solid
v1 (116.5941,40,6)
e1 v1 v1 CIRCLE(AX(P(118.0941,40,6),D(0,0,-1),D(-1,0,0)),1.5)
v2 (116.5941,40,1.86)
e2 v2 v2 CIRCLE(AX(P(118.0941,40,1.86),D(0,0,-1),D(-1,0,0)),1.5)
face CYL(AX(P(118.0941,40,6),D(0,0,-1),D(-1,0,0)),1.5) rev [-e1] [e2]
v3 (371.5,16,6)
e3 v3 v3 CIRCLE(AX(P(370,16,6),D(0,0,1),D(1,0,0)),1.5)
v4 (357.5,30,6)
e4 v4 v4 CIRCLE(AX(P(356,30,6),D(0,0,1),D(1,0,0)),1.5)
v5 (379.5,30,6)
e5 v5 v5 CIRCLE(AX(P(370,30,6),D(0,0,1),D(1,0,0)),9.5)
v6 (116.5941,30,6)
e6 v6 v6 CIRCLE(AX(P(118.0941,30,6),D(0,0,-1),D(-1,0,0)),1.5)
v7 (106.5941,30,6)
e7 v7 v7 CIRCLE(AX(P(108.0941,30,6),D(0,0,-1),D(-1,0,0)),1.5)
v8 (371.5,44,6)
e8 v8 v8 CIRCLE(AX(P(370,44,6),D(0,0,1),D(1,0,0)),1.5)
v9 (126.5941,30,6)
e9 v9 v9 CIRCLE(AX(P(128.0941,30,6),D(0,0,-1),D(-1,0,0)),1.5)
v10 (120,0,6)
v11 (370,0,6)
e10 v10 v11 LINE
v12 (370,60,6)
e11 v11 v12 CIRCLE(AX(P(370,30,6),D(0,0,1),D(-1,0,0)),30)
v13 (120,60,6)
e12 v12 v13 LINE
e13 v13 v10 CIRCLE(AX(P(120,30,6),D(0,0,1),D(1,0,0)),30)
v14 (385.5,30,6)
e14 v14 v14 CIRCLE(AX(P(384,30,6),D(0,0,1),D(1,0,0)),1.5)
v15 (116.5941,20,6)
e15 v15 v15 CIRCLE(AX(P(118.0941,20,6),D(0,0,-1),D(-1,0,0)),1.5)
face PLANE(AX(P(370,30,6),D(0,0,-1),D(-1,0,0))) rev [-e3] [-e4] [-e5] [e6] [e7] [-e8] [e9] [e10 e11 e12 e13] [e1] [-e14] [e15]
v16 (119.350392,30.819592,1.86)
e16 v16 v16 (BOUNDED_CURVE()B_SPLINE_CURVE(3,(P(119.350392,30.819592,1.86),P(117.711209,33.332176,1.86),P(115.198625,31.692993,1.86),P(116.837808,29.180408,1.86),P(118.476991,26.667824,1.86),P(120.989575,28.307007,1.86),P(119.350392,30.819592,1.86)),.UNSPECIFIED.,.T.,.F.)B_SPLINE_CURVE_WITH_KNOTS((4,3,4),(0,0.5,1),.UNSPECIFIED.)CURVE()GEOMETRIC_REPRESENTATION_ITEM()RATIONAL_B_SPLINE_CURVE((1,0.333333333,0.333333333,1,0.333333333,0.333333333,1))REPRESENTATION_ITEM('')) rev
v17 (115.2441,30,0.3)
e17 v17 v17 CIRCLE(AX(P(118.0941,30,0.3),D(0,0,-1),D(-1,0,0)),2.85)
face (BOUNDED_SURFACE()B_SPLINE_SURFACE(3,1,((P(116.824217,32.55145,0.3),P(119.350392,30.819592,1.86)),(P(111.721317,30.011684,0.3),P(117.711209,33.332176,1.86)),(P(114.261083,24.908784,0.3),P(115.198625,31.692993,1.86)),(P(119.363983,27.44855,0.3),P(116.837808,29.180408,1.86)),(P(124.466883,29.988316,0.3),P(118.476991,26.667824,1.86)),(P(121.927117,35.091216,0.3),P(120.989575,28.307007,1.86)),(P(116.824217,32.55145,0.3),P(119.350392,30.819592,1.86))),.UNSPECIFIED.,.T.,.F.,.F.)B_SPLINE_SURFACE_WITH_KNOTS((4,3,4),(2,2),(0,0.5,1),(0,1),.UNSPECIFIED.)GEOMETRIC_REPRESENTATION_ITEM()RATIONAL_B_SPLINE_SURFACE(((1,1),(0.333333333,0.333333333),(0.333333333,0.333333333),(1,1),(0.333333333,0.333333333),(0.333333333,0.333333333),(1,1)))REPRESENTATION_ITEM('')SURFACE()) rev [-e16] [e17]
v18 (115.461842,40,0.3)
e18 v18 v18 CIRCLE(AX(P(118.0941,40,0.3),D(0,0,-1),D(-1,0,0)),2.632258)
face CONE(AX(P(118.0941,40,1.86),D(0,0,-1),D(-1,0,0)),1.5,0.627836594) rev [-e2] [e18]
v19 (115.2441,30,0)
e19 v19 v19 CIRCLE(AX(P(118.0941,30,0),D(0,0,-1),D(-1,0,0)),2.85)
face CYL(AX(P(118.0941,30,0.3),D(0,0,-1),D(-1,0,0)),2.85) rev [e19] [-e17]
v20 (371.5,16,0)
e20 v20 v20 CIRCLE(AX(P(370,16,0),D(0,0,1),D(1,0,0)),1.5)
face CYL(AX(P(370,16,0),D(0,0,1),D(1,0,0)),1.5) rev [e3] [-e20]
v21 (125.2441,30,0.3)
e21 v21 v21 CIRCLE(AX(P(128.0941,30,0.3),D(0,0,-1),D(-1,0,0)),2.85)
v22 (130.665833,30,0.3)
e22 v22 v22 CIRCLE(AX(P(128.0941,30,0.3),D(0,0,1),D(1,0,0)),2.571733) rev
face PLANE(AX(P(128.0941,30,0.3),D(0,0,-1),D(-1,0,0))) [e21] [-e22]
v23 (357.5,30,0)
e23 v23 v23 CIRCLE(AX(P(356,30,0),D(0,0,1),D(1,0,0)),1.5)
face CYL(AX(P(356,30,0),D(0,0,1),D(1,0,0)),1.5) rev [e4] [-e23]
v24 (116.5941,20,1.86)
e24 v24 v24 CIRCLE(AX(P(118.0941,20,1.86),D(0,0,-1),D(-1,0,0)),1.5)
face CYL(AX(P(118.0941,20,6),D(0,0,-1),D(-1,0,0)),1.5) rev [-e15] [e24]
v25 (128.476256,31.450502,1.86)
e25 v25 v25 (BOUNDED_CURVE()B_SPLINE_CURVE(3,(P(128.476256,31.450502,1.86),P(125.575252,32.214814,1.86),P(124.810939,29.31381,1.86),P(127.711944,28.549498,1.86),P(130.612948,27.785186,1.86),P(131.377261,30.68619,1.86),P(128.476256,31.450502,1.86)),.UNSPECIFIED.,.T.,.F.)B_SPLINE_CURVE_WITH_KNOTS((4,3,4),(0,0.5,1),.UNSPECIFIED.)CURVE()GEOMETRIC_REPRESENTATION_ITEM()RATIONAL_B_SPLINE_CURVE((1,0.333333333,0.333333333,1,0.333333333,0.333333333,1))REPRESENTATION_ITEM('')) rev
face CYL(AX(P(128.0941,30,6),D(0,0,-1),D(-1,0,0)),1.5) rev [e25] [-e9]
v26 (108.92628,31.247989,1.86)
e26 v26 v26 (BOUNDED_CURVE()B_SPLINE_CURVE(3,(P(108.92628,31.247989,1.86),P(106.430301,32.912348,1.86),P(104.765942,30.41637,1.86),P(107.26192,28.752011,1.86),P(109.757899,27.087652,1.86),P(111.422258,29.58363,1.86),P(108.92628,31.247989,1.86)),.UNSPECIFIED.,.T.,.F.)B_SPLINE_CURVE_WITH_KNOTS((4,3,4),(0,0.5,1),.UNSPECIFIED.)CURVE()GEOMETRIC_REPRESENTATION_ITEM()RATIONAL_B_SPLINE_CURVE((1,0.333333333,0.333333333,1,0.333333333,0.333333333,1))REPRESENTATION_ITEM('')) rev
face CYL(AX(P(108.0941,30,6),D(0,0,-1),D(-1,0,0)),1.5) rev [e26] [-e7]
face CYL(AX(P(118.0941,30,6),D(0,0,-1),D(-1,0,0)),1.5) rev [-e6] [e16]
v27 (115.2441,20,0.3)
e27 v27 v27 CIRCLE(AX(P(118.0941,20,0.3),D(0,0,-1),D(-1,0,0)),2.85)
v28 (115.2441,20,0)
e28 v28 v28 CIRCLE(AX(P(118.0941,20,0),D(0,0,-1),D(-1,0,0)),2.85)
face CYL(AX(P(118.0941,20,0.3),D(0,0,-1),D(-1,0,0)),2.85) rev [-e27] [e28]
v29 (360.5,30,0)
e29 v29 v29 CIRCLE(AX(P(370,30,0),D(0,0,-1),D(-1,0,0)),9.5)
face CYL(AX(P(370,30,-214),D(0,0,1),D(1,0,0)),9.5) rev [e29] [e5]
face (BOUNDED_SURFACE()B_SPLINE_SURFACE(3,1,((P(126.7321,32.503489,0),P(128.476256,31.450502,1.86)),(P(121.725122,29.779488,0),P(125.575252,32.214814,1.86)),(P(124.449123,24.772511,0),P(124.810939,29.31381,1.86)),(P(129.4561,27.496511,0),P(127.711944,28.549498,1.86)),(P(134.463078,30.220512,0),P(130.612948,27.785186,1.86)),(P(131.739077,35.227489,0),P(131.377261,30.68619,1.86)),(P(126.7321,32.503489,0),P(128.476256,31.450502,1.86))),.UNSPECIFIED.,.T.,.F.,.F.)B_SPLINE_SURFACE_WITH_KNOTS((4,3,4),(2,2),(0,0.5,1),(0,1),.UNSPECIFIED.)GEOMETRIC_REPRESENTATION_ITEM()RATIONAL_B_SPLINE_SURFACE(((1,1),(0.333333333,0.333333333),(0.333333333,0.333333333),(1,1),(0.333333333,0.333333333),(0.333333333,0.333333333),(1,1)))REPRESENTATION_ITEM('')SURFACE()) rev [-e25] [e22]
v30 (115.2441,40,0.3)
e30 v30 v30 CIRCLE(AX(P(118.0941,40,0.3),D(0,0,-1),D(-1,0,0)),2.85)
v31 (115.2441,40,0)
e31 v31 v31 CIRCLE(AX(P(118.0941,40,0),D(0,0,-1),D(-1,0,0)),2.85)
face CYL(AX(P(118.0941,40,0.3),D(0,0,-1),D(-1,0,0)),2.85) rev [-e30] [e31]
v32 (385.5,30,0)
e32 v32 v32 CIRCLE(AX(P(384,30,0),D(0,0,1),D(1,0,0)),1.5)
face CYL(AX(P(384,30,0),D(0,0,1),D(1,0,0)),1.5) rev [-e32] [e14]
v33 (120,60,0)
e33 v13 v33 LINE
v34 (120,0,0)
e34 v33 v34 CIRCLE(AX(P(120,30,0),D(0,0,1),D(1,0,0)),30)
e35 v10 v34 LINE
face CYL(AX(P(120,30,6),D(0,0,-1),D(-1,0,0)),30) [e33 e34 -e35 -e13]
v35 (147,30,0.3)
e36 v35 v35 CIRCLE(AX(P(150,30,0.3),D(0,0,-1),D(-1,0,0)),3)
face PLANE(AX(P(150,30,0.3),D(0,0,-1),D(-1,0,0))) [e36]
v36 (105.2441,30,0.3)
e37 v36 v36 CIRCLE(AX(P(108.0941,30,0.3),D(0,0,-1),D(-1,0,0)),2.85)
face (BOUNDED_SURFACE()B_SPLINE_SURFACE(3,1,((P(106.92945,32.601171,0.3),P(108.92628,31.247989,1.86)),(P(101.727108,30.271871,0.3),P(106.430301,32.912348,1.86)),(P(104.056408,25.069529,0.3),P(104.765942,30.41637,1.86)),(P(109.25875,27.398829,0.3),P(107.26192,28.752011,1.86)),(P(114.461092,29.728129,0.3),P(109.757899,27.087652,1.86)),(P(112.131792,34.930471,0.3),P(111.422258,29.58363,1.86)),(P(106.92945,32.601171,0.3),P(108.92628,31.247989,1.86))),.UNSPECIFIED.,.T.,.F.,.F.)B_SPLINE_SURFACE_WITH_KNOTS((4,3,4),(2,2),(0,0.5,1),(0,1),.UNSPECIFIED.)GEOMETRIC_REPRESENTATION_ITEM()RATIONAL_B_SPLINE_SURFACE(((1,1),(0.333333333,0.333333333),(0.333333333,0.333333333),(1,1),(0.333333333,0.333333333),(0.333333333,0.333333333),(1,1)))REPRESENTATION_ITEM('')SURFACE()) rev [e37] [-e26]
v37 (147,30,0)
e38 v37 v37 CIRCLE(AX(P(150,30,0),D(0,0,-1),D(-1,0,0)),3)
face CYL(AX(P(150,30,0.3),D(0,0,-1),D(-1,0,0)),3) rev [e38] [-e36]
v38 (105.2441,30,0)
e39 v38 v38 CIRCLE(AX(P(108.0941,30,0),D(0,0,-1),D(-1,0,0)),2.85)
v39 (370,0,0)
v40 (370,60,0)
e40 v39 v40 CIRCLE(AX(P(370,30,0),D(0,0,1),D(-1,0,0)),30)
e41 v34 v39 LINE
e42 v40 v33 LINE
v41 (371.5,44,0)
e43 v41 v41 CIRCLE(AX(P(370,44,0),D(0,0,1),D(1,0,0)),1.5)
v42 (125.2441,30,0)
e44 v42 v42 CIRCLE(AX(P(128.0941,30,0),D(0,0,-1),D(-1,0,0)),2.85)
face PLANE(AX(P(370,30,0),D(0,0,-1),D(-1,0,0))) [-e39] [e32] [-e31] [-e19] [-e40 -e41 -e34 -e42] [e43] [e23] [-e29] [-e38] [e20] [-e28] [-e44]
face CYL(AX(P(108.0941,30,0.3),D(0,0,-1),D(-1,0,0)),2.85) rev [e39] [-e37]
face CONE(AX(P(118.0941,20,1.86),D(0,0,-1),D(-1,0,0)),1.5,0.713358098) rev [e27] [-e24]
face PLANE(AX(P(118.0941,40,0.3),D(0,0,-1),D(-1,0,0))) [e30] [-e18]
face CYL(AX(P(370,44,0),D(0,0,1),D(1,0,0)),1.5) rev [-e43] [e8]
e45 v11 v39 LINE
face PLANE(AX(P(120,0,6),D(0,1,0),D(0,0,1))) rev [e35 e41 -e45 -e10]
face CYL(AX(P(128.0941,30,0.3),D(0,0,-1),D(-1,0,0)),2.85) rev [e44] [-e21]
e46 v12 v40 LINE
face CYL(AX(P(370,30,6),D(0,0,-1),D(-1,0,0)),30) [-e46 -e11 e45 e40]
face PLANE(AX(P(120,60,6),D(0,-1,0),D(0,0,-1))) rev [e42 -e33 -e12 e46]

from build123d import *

# Parameters (mm, degrees)
SALIENTE_EXTRUIR1_DEPTH = 6
CROQUIS2_R              = 9.5
CORTAR_EXTRUIR4_DEPTH   = 220
CROQUIS7_R              = 1.5
CORTAR_EXTRUIR5_DEPTH   = 6
CROQUIS8_R              = 3
CROQUIS8_R_2            = 2.85
CORTAR_EXTRUIR6_DEPTH   = 0.3
CROQUIS9_4_R            = 1.5
CROQUIS9_6_R            = 1.5
CROQUIS9_7_R            = 1.5
CORTAR_EXTRUIR7_DEPTH   = 405.496155235


with BuildPart() as part:
    # Croquis1 → Saliente-Extruir1 (new body)
    with BuildSketch(Plane.XY):
        with BuildLine():
            Line((120, 0), (370, 0))
            ThreePointArc((370, 0), (400, 30), (370, 60))
            Line((370, 60), (120, 60))
            ThreePointArc((120, 60), (90, 30), (120, 0))
        make_face()
    extrude(amount=SALIENTE_EXTRUIR1_DEPTH)

    # Croquis2 → Cortar-Extruir4 (cut)
    with BuildSketch(Plane.XY.offset(6)):
        with Locations((370, 30)):
            Circle(CROQUIS2_R)
    extrude(amount=-CORTAR_EXTRUIR4_DEPTH, mode=Mode.SUBTRACT)

    # Croquis7 → Cortar-Extruir5 (cut)
    with BuildSketch(Plane.XY.offset(6)):
        with Locations((370, 16)):
            Circle(CROQUIS7_R)
        with Locations((384, 30)):
            Circle(CROQUIS7_R)
        with Locations((356, 30)):
            Circle(CROQUIS7_R)
        with Locations((370, 44)):
            Circle(CROQUIS7_R)
    extrude(amount=-CORTAR_EXTRUIR5_DEPTH, mode=Mode.SUBTRACT)

    # Croquis8 → Cortar-Extruir6 (cut)
    with BuildSketch(Plane(origin=(0, 0, 0), x_dir=(-1, 0, 0), z_dir=(0, 0, -1))):
        with Locations((-150, 30)):
            Circle(CROQUIS8_R)
        with Locations((-128.0941, 30)):
            Circle(CROQUIS8_R_2)
        with Locations((-118.0941, 30)):
            Circle(CROQUIS8_R_2)
        with Locations((-108.0941, 30)):
            Circle(CROQUIS8_R_2)
        with Locations((-118.0941, 40)):
            Circle(CROQUIS8_R_2)
        with Locations((-118.0941, 20)):
            Circle(CROQUIS8_R_2)
    extrude(amount=-CORTAR_EXTRUIR6_DEPTH, mode=Mode.SUBTRACT)

    # Cortar-Recubrir1: read off the stored shape, not the designer's step
    # Cortar-Recubrir1: loft between two sections, ruled curve by curve
    cortar_recubrir1_from = [
        Edge.make_bspline([(126.732099738, 32.503488623, 0), (121.725122492, 29.779488099, 0), (124.449123016, 24.772510853, 0), (129.456100262, 27.496511377, 0), (134.463077508, 30.220511901, 0), (131.739076984, 35.227489147, 0), (126.732099738, 32.503488623, 0)], [0, 0, 0, 0, 0.5, 0.5, 0.5, 1, 1, 1, 1], 3, [1, 0.333333333, 0.333333333, 1, 0.333333333, 0.333333333, 1]),
    ]
    cortar_recubrir1_to = [
        Edge.make_bspline([(128.476256089, 31.450502232, 1.86), (125.575251625, 32.214814409, 1.86), (124.810939448, 29.313809945, 1.86), (127.711943911, 28.549497768, 1.86), (130.612948375, 27.785185591, 1.86), (131.377260552, 30.686190055, 1.86), (128.476256089, 31.450502232, 1.86)], [0, 0, 0, 0, 0.5, 0.5, 0.5, 1, 1, 1, 1], 3, [1, 0.333333333, 0.333333333, 1, 0.333333333, 0.333333333, 1]),
    ]
    cortar_recubrir1 = Solid(Shell([*[Face.make_surface_from_curves(cortar_recubrir1_from[k], cortar_recubrir1_to[k]) for k in range(1)], Face(Wire(cortar_recubrir1_from)), Face(Wire(cortar_recubrir1_to))]))
    add(cortar_recubrir1, mode=Mode.SUBTRACT)

    # Cortar-Recubrir2: read off the stored shape, not the designer's step
    # Cortar-Recubrir2: loft between two sections, ruled curve by curve
    cortar_recubrir2_from = [
        Edge.make_bspline([(116.824217171, 32.551450098, 0.3), (111.721316976, 30.01168444, 0.3), (114.261082633, 24.908784245, 0.3), (119.363982829, 27.448549902, 0.3), (124.466883024, 29.98831556, 0.3), (121.927117367, 35.091215755, 0.3), (116.824217171, 32.551450098, 0.3)], [0, 0, 0, 0, 0.5, 0.5, 0.5, 1, 1, 1, 1], 3, [1, 0.333333333, 0.333333333, 1, 0.333333333, 0.333333333, 1]),
    ]
    cortar_recubrir2_to = [
        Edge.make_bspline([(119.35039206, 30.81959152, 1.86), (117.71120902, 33.33217564, 1.86), (115.1986249, 31.6929926, 1.86), (116.83780794, 29.18040848, 1.86), (118.47699098, 26.66782436, 1.86), (120.9895751, 28.3070074, 1.86), (119.35039206, 30.81959152, 1.86)], [0, 0, 0, 0, 0.5, 0.5, 0.5, 1, 1, 1, 1], 3, [1, 0.333333333, 0.333333333, 1, 0.333333333, 0.333333333, 1]),
    ]
    cortar_recubrir2 = Solid(Shell([*[Face.make_surface_from_curves(cortar_recubrir2_from[k], cortar_recubrir2_to[k]) for k in range(1)], Face(Wire(cortar_recubrir2_from)), Face(Wire(cortar_recubrir2_to))]))
    add(cortar_recubrir2, mode=Mode.SUBTRACT)

    # Croquis9<4> → section 1 of cortar_recubrir3
    with BuildSketch(Plane(origin=(0, 0, 1.86), x_dir=(-1, 0, 0), z_dir=(0, 0, -1)), mode=Mode.PRIVATE) as cortar_recubrir3_s1:
        with Locations((-118.0941, 40)):
            Circle(CROQUIS9_4_R)
    # loft up to a face of the part (cortar_recubrir3)
    loft([Face(Wire([part.edges().sort_by_distance((120.045059252, 42.077560588, 0))[0]])), cortar_recubrir3_s1.sketch], mode=Mode.SUBTRACT)

    # Cortar-Recubrir4: read off the stored shape, not the designer's step
    # Cortar-Recubrir4: loft between two sections, ruled curve by curve
    cortar_recubrir4_from = [
        Edge.make_bspline([(106.929450137, 32.601171024, 0.3), (101.727108089, 30.271871298, 0.3), (104.056407815, 25.06952925, 0.3), (109.258749863, 27.398828976, 0.3), (114.461091911, 29.728128702, 0.3), (112.131792185, 34.93047075, 0.3), (106.929450137, 32.601171024, 0.3)], [0, 0, 0, 0, 0.5, 0.5, 0.5, 1, 1, 1, 1], 3, [1, 0.333333333, 0.333333333, 1, 0.333333333, 0.333333333, 1]),
    ]
    cortar_recubrir4_to = [
        Edge.make_bspline([(108.926279517, 31.247989283, 1.86), (106.43030095, 32.912348318, 1.86), (104.765941916, 30.416369751, 1.86), (107.261920483, 28.752010717, 1.86), (109.75789905, 27.087651682, 1.86), (111.422258084, 29.583630249, 1.86), (108.926279517, 31.247989283, 1.86)], [0, 0, 0, 0, 0.5, 0.5, 0.5, 1, 1, 1, 1], 3, [1, 0.333333333, 0.333333333, 1, 0.333333333, 0.333333333, 1]),
    ]
    cortar_recubrir4 = Solid(Shell([*[Face.make_surface_from_curves(cortar_recubrir4_from[k], cortar_recubrir4_to[k]) for k in range(1)], Face(Wire(cortar_recubrir4_from)), Face(Wire(cortar_recubrir4_to))]))
    add(cortar_recubrir4, mode=Mode.SUBTRACT)

    # Croquis9<6> → section 1 of cortar_recubrir5
    with BuildSketch(Plane(origin=(0, 0, 1.86), x_dir=(-1, 0, 0), z_dir=(0, 0, -1)), mode=Mode.PRIVATE) as cortar_recubrir5_s1:
        with Locations((-118.0941, 20)):
            Circle(CROQUIS9_6_R)
    # loft up to a face of the part (cortar_recubrir5)
    loft([Face(Wire([part.edges().sort_by_distance((120.045059252, 22.077560588, 0.3))[0]])), cortar_recubrir5_s1.sketch], mode=Mode.SUBTRACT)

    # Croquis9<7> → Cortar-Extruir7 (cut, through all)
    with BuildSketch(Plane(origin=(0, 0, 1.86), x_dir=(-1, 0, 0), z_dir=(0, 0, -1))):
        with Locations((-118.0941, 20)):
            Circle(CROQUIS9_7_R)
        with Locations((-108.0941, 30)):
            Circle(CROQUIS9_7_R)
        with Locations((-118.0941, 30)):
            Circle(CROQUIS9_7_R)
        with Locations((-128.0941, 30)):
            Circle(CROQUIS9_7_R)
        with Locations((-118.0941, 40)):
            Circle(CROQUIS9_7_R)
    extrude(amount=-CORTAR_EXTRUIR7_DEPTH, mode=Mode.SUBTRACT)


solid = part.part
